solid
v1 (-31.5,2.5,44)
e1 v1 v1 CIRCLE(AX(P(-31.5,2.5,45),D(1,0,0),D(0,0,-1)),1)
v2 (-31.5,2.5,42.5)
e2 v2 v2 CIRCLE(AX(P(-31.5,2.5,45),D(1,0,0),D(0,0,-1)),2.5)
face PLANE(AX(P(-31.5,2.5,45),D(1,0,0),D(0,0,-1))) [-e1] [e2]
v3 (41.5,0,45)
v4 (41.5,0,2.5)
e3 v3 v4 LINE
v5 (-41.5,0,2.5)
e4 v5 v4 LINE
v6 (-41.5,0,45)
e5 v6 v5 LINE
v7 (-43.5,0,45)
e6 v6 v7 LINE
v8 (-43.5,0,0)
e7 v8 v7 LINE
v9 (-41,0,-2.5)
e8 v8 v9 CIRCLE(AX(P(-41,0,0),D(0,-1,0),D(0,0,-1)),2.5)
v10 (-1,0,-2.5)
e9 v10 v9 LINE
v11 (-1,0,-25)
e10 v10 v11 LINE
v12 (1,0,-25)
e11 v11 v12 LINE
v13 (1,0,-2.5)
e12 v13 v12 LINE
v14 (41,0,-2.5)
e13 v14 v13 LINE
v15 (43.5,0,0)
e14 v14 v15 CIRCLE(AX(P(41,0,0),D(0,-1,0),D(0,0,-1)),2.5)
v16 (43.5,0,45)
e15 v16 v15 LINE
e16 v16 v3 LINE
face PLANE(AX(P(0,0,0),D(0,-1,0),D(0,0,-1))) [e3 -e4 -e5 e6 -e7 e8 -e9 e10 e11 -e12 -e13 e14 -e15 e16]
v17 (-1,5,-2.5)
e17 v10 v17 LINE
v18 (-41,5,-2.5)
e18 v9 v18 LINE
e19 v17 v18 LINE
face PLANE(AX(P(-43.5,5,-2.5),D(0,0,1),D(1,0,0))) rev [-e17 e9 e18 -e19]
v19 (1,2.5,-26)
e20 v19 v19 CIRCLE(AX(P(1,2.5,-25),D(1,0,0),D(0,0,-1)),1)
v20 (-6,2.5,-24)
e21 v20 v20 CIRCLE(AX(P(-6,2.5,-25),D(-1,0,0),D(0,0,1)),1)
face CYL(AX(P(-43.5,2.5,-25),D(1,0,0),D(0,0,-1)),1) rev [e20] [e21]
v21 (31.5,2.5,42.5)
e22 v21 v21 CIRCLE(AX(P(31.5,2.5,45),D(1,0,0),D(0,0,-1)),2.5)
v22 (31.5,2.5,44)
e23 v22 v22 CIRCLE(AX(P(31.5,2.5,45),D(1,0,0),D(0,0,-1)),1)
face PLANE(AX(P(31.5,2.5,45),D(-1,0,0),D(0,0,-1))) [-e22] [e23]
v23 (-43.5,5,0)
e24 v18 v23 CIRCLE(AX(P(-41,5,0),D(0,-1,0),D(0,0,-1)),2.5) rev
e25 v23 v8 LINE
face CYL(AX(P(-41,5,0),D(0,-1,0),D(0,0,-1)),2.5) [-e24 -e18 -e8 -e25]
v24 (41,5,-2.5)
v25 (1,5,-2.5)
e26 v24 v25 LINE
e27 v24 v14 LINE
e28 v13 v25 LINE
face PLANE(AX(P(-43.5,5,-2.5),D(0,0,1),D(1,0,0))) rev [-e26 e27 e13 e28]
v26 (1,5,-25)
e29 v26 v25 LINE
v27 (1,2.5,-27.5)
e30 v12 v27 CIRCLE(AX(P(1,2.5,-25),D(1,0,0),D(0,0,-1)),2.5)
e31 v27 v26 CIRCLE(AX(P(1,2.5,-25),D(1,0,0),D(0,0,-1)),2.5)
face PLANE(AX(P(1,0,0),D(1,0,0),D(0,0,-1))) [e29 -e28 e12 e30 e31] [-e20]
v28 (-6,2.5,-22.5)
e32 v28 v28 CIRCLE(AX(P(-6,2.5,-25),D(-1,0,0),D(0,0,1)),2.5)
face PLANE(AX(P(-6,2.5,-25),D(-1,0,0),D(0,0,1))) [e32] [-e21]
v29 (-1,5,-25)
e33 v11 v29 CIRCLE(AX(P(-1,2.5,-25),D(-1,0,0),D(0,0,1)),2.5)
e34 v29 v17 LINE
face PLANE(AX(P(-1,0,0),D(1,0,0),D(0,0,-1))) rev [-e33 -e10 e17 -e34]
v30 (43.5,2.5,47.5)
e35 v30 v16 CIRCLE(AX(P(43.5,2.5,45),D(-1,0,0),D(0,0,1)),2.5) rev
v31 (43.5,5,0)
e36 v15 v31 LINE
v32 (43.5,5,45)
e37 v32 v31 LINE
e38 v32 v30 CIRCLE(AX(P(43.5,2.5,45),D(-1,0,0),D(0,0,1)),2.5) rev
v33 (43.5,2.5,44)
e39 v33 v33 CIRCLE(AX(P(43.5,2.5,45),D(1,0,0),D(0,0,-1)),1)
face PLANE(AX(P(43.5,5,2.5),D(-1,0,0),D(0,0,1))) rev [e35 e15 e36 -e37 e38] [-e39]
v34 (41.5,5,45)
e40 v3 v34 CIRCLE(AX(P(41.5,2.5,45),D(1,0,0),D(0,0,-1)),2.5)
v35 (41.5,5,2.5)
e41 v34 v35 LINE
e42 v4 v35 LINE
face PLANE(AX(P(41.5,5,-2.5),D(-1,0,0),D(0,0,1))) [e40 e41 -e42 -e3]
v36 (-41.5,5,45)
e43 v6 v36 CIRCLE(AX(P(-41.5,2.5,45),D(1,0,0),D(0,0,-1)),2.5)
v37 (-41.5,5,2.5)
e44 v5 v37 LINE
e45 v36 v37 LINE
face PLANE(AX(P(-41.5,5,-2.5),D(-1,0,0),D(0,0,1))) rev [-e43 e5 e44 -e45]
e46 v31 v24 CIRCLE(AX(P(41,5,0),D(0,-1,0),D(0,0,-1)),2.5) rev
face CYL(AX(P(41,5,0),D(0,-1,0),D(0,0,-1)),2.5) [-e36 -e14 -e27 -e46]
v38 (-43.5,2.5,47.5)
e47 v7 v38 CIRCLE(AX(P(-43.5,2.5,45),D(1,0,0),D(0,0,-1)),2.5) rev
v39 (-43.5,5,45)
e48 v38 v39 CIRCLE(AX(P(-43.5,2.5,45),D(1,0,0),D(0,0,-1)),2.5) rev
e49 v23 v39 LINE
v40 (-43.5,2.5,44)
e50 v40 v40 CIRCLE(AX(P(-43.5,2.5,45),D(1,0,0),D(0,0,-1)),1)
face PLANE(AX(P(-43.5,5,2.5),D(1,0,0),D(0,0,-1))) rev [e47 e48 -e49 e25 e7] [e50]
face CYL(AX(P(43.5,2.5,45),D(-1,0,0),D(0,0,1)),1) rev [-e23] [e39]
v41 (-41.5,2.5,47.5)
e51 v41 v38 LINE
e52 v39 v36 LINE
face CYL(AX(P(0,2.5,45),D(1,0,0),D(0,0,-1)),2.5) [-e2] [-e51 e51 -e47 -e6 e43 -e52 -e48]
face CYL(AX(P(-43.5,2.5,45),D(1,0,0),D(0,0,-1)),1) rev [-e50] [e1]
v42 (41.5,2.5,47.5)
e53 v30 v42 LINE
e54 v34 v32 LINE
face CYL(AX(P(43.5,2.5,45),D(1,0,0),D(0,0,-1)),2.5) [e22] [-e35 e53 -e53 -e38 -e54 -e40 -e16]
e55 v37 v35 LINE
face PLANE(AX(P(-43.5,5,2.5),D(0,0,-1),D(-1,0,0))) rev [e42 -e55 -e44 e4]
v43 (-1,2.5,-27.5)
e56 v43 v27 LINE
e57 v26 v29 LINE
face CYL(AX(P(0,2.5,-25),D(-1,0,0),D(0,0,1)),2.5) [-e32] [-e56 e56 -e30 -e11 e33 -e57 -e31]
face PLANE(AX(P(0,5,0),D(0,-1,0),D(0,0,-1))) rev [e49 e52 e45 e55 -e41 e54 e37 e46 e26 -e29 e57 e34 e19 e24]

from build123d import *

# Parameters (mm, degrees)
ESBO_O1_W                  = 87
ESBO_O1_H                  = 5
RESSALTO_EXTRUS_O1_DEPTH   = 5
ESBO_O2_W                  = 2
ESBO_O2_H                  = 50
RESSALTO_EXTRUS_O2_DEPTH   = 5
FILETE1_R                  = 2.5
ESBO_O6_R                  = 2.5
RESSALTO_EXTRUS_O4_DEPTH   = 10
ESBO_O7_R                  = 1
CORTE_EXTRUS_O3_DEPTH      = 89.917096219
FILETE1_OF_ESPELHAR1_R     = 2.5
FILETE2_R                  = 2.5
ESBO_O4_W                  = 30
ESBO_O4_H                  = 5
RESSALTO_EXTRUS_O3_DEPTH   = 1
FILETE3_R                  = 2.5
ESBO_O8_R                  = 2.5
RESSALTO_EXTRUS_O5_DEPTH   = 5
CORTE_EXTRUS_O2_DEPTH      = 65.602631525
CORTE_EXTRUS_O2_DEPTH_BACK = 65.602631525
ESBO_O5_R                  = 1


with BuildPart() as part:
    # Esboço1 → Ressalto-extrusão1 (new body)
    with BuildSketch(Plane(origin=(0, 0, 0), x_dir=(1, 0, 0), z_dir=(0, 1, 0))):
        Rectangle(ESBO_O1_W, ESBO_O1_H)
    extrude(amount=RESSALTO_EXTRUS_O1_DEPTH)

    # Esboço2 → Ressalto-extrusão2 (add)
    with BuildSketch(Plane(origin=(0, 0, 0), x_dir=(1, 0, 0), z_dir=(0, 1, 0))):
        with Locations((-42.5, -22.5)):
            Rectangle(ESBO_O2_W, ESBO_O2_H)
    ressalto_extrus_o2 = extrude(amount=RESSALTO_EXTRUS_O2_DEPTH)

    # Filete1
    filete1_edges = [part.edges().sort_by_distance(p)[0] for p in [
        (-42.5, 0, 47.5),
        (-42.5, 5, 47.5),
    ]]
    fillet(filete1_edges, radius=FILETE1_R - 0.0001)  # a hair under: the kernel refuses the full size

    # Esboço6 → Ressalto-extrusão4 (add)
    with BuildSketch(Plane(origin=(-41.5, 0, 0), x_dir=(0, 0, -1), z_dir=(1, 0, 0))):
        with Locations((-45, 2.5)):
            Circle(ESBO_O6_R)
    ressalto_extrus_o4 = extrude(amount=RESSALTO_EXTRUS_O4_DEPTH)

    # Esboço7 → Corte-extrusão3 (cut, through all)
    with BuildSketch(Plane(origin=(-31.5, 0, 0), x_dir=(0, 0, -1), z_dir=(1, 0, 0))):
        with Locations((-45, 2.5)):
            Circle(ESBO_O7_R)
    corte_extrus_o3 = extrude(amount=-CORTE_EXTRUS_O3_DEPTH, mode=Mode.SUBTRACT)

    # Espelhar1: Ressalto-extrusão2, Ressalto-extrusão4, Corte-extrusão3 across plane
    add(ressalto_extrus_o2.mirror(Plane(origin=(0, 0, 0), x_dir=(0, 0, 1), z_dir=(1, 0, 0))))
    add(ressalto_extrus_o4.mirror(Plane(origin=(0, 0, 0), x_dir=(0, 0, 1), z_dir=(1, 0, 0))))
    add(corte_extrus_o3.mirror(Plane(origin=(0, 0, 0), x_dir=(0, 0, 1), z_dir=(1, 0, 0))), mode=Mode.SUBTRACT)

    # Filete1 of Espelhar1
    filete1_of_espelhar1_edges = [part.edges().sort_by_distance(p)[0] for p in [
        (42.5, 0, 47.5),
        (42.5, 5, 47.5),
    ]]
    fillet(filete1_of_espelhar1_edges, radius=FILETE1_OF_ESPELHAR1_R - 0.0001)  # a hair under: the kernel refuses the full size

    # Filete2
    filete2_edges = [part.edges().sort_by_distance(p)[0] for p in [
        (-43.5, 2.5, -2.5),
        (43.5, 2.5, -2.5),
    ]]
    fillet(filete2_edges, radius=FILETE2_R)

    # Esboço4 → Ressalto-extrusão3 (add, symmetric)
    with BuildSketch(Plane(origin=(0, 0, 0), x_dir=(0, 0, -1), z_dir=(1, 0, 0))):
        with Locations((12.5, 2.5)):
            Rectangle(ESBO_O4_W, ESBO_O4_H)
    extrude(amount=RESSALTO_EXTRUS_O3_DEPTH, both=True)

    # Filete3
    filete3_edges = [part.edges().sort_by_distance(p)[0] for p in [
        (0, 5, -27.5),
        (0, 0, -27.5),
    ]]
    fillet(filete3_edges, radius=FILETE3_R - 0.0001)  # a hair under: the kernel refuses the full size

    # Esboço8 → Ressalto-extrusão5 (add)
    with BuildSketch(Plane.ZY.offset(1)):
        with Locations((-25, 2.5)):
            Circle(ESBO_O8_R)
    extrude(amount=RESSALTO_EXTRUS_O5_DEPTH)

    # Esboço5 → Corte-extrusão2 (cut, two sides: drawn at the far end of the back side and taken through both)
    with BuildSketch(Plane(origin=(0, 0, 0), x_dir=(0, 0, -1), z_dir=(1, 0, 0)).offset(-CORTE_EXTRUS_O2_DEPTH_BACK)):
        with Locations((25, 2.5)):
            Circle(ESBO_O5_R)
    extrude(amount=CORTE_EXTRUS_O2_DEPTH + CORTE_EXTRUS_O2_DEPTH_BACK, mode=Mode.SUBTRACT)


solid = part.part
